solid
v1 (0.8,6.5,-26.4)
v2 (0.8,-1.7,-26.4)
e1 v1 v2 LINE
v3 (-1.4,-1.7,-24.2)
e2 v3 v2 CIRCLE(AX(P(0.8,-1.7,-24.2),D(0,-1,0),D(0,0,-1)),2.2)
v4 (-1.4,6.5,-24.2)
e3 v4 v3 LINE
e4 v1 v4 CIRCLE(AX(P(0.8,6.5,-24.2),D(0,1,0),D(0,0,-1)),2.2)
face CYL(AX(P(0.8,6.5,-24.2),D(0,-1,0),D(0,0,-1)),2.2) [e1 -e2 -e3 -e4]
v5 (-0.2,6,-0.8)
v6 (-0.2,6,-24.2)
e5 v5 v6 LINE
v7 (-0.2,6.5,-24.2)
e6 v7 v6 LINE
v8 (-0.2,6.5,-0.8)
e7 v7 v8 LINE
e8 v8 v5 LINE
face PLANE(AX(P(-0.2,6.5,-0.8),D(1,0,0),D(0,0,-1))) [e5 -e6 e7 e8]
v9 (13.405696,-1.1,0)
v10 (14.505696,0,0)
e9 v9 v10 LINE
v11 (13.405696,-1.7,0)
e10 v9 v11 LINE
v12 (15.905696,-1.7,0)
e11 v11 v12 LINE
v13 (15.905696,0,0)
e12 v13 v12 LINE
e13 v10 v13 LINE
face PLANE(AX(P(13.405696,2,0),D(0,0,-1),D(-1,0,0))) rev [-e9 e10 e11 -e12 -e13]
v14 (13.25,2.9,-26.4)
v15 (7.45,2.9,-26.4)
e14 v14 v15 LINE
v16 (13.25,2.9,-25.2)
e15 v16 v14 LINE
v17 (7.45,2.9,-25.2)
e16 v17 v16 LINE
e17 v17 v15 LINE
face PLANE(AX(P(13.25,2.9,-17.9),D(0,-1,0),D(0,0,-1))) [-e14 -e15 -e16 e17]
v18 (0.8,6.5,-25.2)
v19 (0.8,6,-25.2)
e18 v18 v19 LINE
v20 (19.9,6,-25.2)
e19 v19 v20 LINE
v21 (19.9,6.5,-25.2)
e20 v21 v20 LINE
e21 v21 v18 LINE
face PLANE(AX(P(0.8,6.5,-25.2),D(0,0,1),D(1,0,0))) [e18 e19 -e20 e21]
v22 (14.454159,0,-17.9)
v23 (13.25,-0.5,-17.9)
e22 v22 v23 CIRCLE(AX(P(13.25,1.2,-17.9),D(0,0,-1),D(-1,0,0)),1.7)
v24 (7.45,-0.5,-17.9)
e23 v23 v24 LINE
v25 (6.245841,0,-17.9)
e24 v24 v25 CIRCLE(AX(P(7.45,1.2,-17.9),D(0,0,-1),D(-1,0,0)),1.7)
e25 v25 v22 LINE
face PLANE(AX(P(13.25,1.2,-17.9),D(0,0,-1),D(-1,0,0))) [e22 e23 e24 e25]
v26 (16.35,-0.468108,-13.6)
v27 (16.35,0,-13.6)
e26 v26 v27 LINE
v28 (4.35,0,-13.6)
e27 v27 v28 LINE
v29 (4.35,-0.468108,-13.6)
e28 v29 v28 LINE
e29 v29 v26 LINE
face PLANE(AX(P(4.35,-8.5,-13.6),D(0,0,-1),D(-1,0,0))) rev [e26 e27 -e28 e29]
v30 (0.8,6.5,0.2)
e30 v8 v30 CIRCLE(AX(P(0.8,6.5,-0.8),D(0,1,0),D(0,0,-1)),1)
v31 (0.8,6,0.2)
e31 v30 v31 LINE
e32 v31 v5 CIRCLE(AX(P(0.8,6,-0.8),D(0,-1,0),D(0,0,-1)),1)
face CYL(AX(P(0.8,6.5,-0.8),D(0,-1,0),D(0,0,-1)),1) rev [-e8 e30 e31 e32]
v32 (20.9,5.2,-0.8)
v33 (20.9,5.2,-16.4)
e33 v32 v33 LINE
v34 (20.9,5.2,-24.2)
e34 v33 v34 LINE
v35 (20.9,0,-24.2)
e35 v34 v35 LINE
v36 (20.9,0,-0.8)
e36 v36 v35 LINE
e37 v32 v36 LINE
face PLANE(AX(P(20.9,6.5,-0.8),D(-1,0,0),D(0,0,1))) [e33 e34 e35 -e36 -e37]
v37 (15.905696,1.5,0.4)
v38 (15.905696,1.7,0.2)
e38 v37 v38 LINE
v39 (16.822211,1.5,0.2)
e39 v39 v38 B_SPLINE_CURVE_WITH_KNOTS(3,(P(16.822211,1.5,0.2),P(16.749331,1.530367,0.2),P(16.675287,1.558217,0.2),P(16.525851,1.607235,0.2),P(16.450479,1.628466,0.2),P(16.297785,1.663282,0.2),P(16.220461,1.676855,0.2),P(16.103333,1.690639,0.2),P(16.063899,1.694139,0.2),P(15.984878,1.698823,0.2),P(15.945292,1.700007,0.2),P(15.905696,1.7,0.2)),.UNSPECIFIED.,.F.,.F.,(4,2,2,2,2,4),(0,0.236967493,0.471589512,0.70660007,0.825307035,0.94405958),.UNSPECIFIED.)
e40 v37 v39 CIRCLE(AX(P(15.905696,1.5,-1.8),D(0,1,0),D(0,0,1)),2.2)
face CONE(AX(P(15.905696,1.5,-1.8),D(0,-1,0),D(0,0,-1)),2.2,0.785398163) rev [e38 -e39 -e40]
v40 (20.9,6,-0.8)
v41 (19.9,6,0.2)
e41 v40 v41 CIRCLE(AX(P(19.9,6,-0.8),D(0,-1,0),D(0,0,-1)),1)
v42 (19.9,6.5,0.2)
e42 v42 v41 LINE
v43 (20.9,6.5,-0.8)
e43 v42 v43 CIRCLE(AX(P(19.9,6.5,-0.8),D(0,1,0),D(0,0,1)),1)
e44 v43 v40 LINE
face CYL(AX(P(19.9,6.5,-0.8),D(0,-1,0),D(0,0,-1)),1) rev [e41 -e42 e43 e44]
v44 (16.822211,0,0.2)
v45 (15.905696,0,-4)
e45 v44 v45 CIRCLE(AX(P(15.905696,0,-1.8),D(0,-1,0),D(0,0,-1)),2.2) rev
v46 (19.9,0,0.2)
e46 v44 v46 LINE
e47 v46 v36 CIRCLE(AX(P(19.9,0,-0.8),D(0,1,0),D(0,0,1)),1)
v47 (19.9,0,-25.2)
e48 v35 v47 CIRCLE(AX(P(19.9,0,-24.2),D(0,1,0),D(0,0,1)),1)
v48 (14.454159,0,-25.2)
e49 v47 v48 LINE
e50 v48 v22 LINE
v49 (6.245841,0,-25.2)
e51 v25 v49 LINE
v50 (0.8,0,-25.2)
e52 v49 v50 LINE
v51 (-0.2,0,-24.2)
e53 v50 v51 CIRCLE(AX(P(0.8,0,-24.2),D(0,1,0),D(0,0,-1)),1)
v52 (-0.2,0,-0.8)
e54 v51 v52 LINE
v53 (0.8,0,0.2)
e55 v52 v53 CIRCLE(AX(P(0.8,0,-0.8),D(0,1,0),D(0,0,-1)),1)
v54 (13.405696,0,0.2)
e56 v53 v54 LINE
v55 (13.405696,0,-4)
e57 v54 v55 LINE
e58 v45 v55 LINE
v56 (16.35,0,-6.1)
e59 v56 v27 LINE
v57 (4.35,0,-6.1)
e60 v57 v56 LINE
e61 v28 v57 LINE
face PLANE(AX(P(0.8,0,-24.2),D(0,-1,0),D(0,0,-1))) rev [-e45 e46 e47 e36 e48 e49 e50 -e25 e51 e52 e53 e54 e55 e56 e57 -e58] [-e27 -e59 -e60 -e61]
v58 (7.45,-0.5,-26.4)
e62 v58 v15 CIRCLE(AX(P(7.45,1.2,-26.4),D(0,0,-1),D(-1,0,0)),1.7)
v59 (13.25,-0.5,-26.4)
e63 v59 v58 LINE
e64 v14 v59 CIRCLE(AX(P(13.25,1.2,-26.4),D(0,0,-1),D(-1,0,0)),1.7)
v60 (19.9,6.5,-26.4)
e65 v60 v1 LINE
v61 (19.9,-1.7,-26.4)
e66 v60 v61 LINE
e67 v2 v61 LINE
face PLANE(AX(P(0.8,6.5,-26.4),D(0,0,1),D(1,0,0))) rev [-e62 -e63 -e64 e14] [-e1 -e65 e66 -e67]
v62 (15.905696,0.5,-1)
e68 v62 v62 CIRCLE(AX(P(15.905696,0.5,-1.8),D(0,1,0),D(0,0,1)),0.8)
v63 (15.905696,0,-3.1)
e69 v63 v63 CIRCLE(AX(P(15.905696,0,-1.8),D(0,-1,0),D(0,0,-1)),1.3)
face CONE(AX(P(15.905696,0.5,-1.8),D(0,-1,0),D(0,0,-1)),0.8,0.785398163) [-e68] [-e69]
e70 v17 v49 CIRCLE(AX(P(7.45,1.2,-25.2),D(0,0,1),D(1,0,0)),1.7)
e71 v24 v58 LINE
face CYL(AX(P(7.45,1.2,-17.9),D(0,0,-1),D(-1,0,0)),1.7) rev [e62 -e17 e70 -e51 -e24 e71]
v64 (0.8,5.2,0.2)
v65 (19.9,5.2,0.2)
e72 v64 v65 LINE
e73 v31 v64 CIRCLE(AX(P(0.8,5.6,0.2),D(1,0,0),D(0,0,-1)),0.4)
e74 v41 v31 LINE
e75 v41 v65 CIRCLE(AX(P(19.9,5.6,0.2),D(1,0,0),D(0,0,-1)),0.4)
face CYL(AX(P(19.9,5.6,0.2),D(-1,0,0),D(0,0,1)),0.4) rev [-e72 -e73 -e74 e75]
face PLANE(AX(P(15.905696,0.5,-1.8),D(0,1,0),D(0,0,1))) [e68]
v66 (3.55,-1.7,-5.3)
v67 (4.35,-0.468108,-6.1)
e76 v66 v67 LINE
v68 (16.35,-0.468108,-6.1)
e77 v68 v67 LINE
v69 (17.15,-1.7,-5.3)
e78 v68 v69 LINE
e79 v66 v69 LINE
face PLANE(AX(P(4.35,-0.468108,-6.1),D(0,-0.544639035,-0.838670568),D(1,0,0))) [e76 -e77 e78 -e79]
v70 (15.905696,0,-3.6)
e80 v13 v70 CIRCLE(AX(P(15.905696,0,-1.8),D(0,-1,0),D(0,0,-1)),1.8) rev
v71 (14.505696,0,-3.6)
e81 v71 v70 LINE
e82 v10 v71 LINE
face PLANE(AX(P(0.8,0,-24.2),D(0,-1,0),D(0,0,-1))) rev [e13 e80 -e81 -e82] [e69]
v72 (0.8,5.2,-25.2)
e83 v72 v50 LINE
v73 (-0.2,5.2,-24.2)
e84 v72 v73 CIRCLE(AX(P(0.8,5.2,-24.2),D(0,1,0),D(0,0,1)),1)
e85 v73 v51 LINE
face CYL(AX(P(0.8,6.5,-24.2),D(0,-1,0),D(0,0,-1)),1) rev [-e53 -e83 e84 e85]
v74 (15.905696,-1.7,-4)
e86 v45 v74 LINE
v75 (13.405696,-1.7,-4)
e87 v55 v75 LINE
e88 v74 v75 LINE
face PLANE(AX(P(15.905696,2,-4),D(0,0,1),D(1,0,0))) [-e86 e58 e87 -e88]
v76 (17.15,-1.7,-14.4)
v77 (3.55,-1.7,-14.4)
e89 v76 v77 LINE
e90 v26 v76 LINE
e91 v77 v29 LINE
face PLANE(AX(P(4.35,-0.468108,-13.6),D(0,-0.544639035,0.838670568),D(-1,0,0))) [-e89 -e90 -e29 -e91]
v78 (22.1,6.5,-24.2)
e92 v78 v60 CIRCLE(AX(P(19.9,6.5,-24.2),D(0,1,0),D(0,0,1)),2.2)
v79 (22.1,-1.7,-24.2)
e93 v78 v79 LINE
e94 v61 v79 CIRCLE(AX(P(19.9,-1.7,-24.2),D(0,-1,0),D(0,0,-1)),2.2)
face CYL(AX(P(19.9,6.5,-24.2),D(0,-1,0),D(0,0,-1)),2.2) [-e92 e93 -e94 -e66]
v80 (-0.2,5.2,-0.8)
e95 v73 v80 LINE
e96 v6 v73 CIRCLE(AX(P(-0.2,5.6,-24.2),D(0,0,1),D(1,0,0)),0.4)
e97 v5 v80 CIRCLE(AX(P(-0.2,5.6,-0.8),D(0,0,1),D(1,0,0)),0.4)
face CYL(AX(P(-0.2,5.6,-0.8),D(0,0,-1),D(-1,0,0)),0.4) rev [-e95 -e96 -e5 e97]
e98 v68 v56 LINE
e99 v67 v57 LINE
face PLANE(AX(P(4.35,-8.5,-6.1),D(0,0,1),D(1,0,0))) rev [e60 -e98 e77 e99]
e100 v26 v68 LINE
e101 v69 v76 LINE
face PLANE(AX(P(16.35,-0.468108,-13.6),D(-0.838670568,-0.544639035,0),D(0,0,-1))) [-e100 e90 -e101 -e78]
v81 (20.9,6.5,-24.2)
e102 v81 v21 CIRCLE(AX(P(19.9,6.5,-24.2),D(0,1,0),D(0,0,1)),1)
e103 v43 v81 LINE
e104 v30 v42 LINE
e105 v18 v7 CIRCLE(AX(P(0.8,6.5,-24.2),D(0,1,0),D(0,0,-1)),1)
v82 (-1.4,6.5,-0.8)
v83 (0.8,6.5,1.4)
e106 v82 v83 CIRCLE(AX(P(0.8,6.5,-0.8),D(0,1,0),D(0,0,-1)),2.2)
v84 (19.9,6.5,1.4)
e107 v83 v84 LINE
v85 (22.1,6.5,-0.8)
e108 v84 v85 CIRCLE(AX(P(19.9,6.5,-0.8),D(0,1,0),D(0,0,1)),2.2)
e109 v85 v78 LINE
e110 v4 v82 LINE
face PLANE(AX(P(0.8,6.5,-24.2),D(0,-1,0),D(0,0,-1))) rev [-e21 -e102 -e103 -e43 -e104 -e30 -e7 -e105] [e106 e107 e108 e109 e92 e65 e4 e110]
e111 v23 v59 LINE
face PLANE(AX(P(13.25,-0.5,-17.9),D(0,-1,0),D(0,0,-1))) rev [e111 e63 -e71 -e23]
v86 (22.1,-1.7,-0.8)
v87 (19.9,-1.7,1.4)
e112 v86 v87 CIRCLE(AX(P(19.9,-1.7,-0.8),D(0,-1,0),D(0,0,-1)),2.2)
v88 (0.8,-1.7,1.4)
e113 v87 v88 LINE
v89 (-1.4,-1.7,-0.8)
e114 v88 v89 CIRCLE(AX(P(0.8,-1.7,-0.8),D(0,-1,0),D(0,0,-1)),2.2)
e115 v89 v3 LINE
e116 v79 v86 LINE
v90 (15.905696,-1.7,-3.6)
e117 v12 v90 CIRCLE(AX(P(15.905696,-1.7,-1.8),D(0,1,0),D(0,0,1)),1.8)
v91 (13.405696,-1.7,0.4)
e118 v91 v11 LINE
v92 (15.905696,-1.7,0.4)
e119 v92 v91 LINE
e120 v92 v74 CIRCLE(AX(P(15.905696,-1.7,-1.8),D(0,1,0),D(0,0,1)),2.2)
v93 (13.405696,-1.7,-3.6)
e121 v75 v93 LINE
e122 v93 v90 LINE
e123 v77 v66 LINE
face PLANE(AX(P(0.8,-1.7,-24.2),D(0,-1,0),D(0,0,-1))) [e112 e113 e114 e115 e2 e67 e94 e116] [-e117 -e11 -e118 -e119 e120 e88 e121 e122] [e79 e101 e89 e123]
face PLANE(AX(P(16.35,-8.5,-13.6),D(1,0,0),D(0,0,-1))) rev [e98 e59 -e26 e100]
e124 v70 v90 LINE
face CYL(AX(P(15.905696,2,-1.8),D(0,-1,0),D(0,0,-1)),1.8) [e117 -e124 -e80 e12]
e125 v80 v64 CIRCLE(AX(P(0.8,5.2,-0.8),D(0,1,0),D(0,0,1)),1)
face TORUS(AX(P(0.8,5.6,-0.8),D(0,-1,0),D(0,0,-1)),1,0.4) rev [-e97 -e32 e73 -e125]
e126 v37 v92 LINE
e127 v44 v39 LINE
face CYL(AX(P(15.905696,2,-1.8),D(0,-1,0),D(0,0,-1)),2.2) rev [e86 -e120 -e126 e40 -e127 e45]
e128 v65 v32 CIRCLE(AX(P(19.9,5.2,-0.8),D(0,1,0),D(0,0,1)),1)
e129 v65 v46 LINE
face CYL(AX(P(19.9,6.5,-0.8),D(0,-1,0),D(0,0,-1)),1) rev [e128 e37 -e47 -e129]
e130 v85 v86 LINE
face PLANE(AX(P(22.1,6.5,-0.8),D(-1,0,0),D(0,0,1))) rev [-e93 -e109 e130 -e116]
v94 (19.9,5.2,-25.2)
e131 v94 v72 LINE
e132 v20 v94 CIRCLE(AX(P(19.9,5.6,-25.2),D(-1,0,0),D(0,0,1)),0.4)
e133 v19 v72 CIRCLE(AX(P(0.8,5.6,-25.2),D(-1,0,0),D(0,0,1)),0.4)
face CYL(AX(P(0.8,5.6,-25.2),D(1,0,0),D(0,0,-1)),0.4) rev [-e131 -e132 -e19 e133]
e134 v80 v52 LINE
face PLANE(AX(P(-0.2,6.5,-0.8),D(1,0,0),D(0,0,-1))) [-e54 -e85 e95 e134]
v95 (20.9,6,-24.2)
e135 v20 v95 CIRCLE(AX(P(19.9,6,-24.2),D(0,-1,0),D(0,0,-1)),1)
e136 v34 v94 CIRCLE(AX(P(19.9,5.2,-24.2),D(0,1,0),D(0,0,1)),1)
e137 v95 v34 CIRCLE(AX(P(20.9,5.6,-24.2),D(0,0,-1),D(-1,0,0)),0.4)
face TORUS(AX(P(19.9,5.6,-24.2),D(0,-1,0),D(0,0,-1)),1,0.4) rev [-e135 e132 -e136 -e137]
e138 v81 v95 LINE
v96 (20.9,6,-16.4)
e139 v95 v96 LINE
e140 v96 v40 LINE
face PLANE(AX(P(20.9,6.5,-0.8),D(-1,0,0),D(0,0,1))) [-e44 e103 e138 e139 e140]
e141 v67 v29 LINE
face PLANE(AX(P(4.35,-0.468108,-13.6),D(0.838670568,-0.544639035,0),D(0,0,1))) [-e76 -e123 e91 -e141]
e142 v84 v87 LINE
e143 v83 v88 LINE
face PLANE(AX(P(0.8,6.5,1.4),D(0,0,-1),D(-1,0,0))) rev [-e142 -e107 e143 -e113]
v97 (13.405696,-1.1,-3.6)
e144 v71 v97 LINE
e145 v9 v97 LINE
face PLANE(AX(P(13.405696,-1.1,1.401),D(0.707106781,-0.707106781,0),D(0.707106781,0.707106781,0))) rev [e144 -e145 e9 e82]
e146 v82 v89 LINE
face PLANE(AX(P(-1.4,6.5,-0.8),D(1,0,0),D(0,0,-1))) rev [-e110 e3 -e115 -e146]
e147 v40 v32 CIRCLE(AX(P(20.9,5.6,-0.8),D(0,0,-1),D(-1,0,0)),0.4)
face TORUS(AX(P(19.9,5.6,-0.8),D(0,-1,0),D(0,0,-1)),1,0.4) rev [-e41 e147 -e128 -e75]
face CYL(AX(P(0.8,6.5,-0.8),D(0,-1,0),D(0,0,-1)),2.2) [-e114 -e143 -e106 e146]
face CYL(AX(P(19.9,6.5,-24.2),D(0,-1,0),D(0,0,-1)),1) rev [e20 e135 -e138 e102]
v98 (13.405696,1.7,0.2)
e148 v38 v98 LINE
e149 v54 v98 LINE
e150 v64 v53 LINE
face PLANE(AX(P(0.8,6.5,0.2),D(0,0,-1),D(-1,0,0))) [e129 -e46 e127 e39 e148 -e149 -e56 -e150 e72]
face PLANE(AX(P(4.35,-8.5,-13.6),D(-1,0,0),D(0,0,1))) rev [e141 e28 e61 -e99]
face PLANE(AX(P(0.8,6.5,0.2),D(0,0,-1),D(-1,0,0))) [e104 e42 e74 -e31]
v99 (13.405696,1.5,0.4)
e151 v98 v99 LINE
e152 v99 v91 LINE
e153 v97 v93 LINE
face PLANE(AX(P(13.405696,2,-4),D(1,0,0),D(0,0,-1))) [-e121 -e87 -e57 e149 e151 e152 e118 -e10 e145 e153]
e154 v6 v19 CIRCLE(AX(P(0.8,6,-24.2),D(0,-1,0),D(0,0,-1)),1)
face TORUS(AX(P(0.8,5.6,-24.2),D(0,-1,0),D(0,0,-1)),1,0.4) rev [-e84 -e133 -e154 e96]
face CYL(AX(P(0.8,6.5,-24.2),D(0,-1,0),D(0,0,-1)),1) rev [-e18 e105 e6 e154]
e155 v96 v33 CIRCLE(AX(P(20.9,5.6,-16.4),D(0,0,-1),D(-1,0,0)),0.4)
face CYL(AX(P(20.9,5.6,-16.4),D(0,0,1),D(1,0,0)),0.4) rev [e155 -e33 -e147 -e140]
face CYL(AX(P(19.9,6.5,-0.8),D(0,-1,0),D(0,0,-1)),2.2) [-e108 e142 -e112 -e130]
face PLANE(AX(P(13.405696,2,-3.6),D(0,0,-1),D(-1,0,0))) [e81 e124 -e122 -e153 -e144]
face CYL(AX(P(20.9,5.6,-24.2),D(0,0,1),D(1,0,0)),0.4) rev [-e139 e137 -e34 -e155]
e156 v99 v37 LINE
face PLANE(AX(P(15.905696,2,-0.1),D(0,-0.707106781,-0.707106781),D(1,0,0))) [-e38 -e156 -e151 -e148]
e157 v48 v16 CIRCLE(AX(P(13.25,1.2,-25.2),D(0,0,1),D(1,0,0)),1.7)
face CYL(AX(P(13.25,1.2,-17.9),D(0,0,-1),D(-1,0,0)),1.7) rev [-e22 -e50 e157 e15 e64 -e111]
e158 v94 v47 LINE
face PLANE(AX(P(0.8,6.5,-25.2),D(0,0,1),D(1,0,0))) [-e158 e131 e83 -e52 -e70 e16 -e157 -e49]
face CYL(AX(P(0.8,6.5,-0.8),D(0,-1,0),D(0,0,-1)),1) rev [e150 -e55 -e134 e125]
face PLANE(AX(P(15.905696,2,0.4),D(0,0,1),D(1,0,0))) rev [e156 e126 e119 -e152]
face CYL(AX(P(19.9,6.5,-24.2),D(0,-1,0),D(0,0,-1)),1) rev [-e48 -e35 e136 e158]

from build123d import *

# Parameters (mm, degrees)
BOSS_EXTRUDE7_DEPTH     = 6.5
BOSS_EXTRUDE8_START     = 1.7
BOSS_EXTRUDE8_DEPTH     = 1.7
CUT_EXTRUDE1_DEPTH      = 8.5
SKETCH6_W               = 12
SKETCH6_H               = 7.5
CUT_EXTRUDE2_DEPTH      = 8.5
CHAMFER1_SIZE           = 0.8
CHAMFER1_SIZE2          = 1.231891971
SKETCH7_R               = 0.4
CUT_EXTRUDE3_DEPTH      = 2
CUT_EXTRUDE3_DEPTH_BACK = 36.03740858
CHAMFER2_SIZE           = 0.5
CUT_EXTRUDE4_REACH      = 34.411
SKETCH12_R              = 0.8
BOSS_EXTRUDE9_DEPTH     = 0.5
CHAMFER3_SIZE           = 0.5


# Some blends are built 0.0001 mm under size
with BuildPart() as part:
    # Sketch1 → Boss-Extrude7 (new body)
    with BuildSketch(Plane(origin=(0, 0, 0), x_dir=(1, 0, 0), z_dir=(0, 1, 0))):
        with BuildLine():
            Line((0.8, 26.4), (19.9, 26.4))
            ThreePointArc((19.9, 26.4), (21.455634919, 25.755634919), (22.1, 24.2))
            Line((22.1, 24.2), (22.1, 0.8))
            ThreePointArc((22.1, 0.8), (21.455634919, -0.755634919), (19.9, -1.4))
            Line((19.9, -1.4), (0.8, -1.4))
            ThreePointArc((0.8, -1.4), (-0.755634919, -0.755634919), (-1.4, 0.8))
            Line((-1.4, 0.8), (-1.4, 24.2))
            ThreePointArc((-1.4, 24.2), (-0.755634919, 25.755634919), (0.8, 26.4))
        make_face()
        with BuildLine():
            Line((0.8, 25.2), (19.9, 25.2))
            ThreePointArc((19.9, 25.2), (20.607106781, 24.907106781), (20.9, 24.2))
            Line((20.9, 24.2), (20.9, 0.8))
            ThreePointArc((20.9, 0.8), (20.607106781, 0.092893219), (19.9, -0.2))
            Line((19.9, -0.2), (0.8, -0.2))
            ThreePointArc((0.8, -0.2), (0.092893219, 0.092893219), (-0.2, 0.8))
            Line((-0.2, 0.8), (-0.2, 24.2))
            ThreePointArc((-0.2, 24.2), (0.092893219, 24.907106781), (0.8, 25.2))
        make_face(mode=Mode.SUBTRACT)
    extrude(amount=BOSS_EXTRUDE7_DEPTH)

    # Sketch4 → Boss-Extrude8 (add)
    with BuildSketch(Plane.XZ.offset(BOSS_EXTRUDE8_START)):
        with BuildLine():
            Line((0.8, -26.4), (19.9, -26.4))
            ThreePointArc((19.9, -26.4), (21.455634919, -25.755634919), (22.1, -24.2))
            Line((22.1, -24.2), (22.1, -0.8))
            ThreePointArc((22.1, -0.8), (21.455634919, 0.755634919), (19.9, 1.4))
            Line((19.9, 1.4), (0.8, 1.4))
            ThreePointArc((0.8, 1.4), (-0.755634919, 0.755634919), (-1.4, -0.8))
            Line((-1.4, -0.8), (-1.4, -24.2))
            ThreePointArc((-1.4, -24.2), (-0.755634919, -25.755634919), (0.8, -26.4))
        make_face()
    extrude(amount=-BOSS_EXTRUDE8_DEPTH)

    # Sketch5 → Cut-Extrude1 (cut)
    with BuildSketch(Plane(origin=(0, 0, -26.4), x_dir=(-1, 0, 0), z_dir=(0, 0, -1))):
        with BuildLine():
            Line((-13.25, 2.9), (-7.45, 2.9))
            ThreePointArc((-7.45, 2.9), (-5.75, 1.2), (-7.45, -0.5))
            Line((-7.45, -0.5), (-13.25, -0.5))
            ThreePointArc((-13.25, -0.5), (-14.95, 1.2), (-13.25, 2.9))
        make_face()
    extrude(amount=-CUT_EXTRUDE1_DEPTH, mode=Mode.SUBTRACT)

    # Sketch6 → Cut-Extrude2 (cut)
    with BuildSketch(Plane(origin=(0, 0, 0), x_dir=(1, 0, 0), z_dir=(0, 1, 0))):
        with Locations((10.35, 9.85)):
            Rectangle(SKETCH6_W, SKETCH6_H)
    extrude(amount=-CUT_EXTRUDE2_DEPTH, mode=Mode.SUBTRACT)

    # Chamfer1
    chamfer1_edges = [part.edges().sort_by_distance(p)[0] for p in [
        (10.35, -1.7, -6.1),
        (16.35, -1.7, -9.85),
        (10.35, -1.7, -13.6),
        (4.35, -1.7, -9.85),
    ]]
    chamfer1_side = [part.faces().sort_by_distance(p)[0] for p in [
        (-0.498235424, -1.7, -25.498235424),
    ]]
    chamfer(chamfer1_edges, length=CHAMFER1_SIZE, length2=CHAMFER1_SIZE2, reference=chamfer1_side[0])

    # Cut-Sweep1: sweep along a path in Sketch9
    with BuildLine(Plane(origin=(0, 6.5, 0), x_dir=(1, 0, 0), z_dir=(0, 1, 0))) as cut_sweep1_path:
        Line((-1.4, 24.2), (-1.4, 0.8))
        ThreePointArc((-1.4, 0.8), (-0.755634919, -0.755634919), (0.8, -1.4))
        Line((0.8, -1.4), (19.9, -1.4))
        ThreePointArc((19.9, -1.4), (21.455634919, -0.755634919), (22.1, 0.8))
        Line((22.1, 0.8), (22.1, 24.2))
        ThreePointArc((22.1, 24.2), (21.455634919, 25.755634919), (19.9, 26.4))
        Line((19.9, 26.4), (0.8, 26.4))
        ThreePointArc((0.8, 26.4), (-0.755634919, 25.755634919), (-1.4, 24.2))
    # Sketch7 → Cut-Sweep1 (sweep, cut)
    with BuildSketch(Plane(origin=(0, 0, -16.4), x_dir=(-1, 0, 0), z_dir=(0, 0, -1))):
        with Locations((-20.9, 5.6)):
            Circle(SKETCH7_R)
    sweep(path=cut_sweep1_path.line, mode=Mode.SUBTRACT)

    # Sketch10 → Cut-Extrude3 (cut, two sides: drawn at the far end of the back side and taken through both)
    with BuildSketch(Plane(origin=(0, 0, 0), x_dir=(1, 0, 0), z_dir=(0, 1, 0)).offset(-CUT_EXTRUDE3_DEPTH_BACK)):
        with BuildLine():
            Line((15.905695732, 4), (13.405695732, 4))
            Line((13.405695732, 4), (13.405695732, 3.6))
            Line((13.405695732, 3.6), (15.905695732, 3.6))
            ThreePointArc((15.905695732, 3.6), (17.705695732, 1.8), (15.905695732, 0))
            Line((15.905695732, 0), (13.405695732, 0))
            Line((13.405695732, 0), (13.405695732, -0.4))
            Line((13.405695732, -0.4), (15.905695732, -0.4))
            ThreePointArc((15.905695732, -0.4), (18.105695732, 1.8), (15.905695732, 4))
        make_face()
    extrude(amount=CUT_EXTRUDE3_DEPTH + CUT_EXTRUDE3_DEPTH_BACK, mode=Mode.SUBTRACT)

    # Chamfer2
    # the kernel refuses this chamfer: 0.5 mm, written as the material it adds along each edge
    with BuildSketch(Plane(origin=(15.905695732, 2, -1.8), x_dir=(0, 0, 1), z_dir=(-1, 0, 0))) as chamfer2_piece_1_section:
        Polygon((2.2, -CHAMFER2_SIZE), (2.2 - CHAMFER2_SIZE, 0), (2.2, 0), align=None)
    chamfer2_piece_1 = revolve(axis=Axis((15.905695732, 2, -1.8), (0, 1, 0)), revolution_arc=58.108843161, mode=Mode.PRIVATE)
    chamfer2_piece_1 = split(chamfer2_piece_1, bisect_by=Plane(origin=(16.26277058, 1.786381102, 0.2), z_dir=(0, 0, 1)), keep=Keep.TOP, mode=Mode.PRIVATE)
    add(chamfer2_piece_1)
    with BuildSketch(Plane(origin=(12.119854238, 2, 0.4), x_dir=(0, -0.9996219169112968, 0.02749587661058638), z_dir=(1, 0, 0))) as chamfer2_piece_2_section:
        Polygon((CHAMFER2_SIZE * 0.999621916911, CHAMFER2_SIZE * 0.0274958766106), (-CHAMFER2_SIZE * 0.0274958766106, CHAMFER2_SIZE * 0.999621916911), (0, 0), align=None)
    chamfer2_piece_2 = extrude(amount=3.785841494, mode=Mode.PRIVATE)
    chamfer2_piece_2 = split(chamfer2_piece_2, bisect_by=Plane(origin=(14.374950242, 1.792648103, 0.2), z_dir=(0, 0, 1)), keep=Keep.TOP, mode=Mode.PRIVATE)
    add(chamfer2_piece_2)

    # Sketch11 → Cut-Extrude4 (cut, up to next)
    with BuildSketch(Plane(origin=(0, 0, -3.6), x_dir=(-1, 0, 0), z_dir=(0, 0, -1)), mode=Mode.PRIVATE) as cut_extrude4_sk1:
        Polygon((-13.405695732, 0), (-13.405695732, -1.1), (-14.505695732, 0), align=None)
    cut_extrude4_tool1 = extrude(cut_extrude4_sk1.sketch, amount=-CUT_EXTRUDE4_REACH, mode=Mode.PRIVATE) & part.part
    add(cut_extrude4_tool1.solids().sort_by_distance((13.772362, -0.366667, -3.6))[0], mode=Mode.SUBTRACT)

    # Sketch12 → Boss-Extrude9 (add)
    with BuildSketch(Plane(origin=(0, 0, 0), x_dir=(1, 0, 0), z_dir=(0, 1, 0))):
        with Locations(Location((15.905695732, 1.8, 0), (0, 0, 270))):
            Circle(SKETCH12_R)
    extrude(amount=BOSS_EXTRUDE9_DEPTH)

    # Chamfer3
    chamfer3_edges = [part.edges().sort_by_distance(p)[0] for p in [
        (15.905695732, 0, -2.6),
    ]]
    chamfer(chamfer3_edges, length=CHAMFER3_SIZE - 0.0001)  # a hair under: the kernel refuses the full size


solid = part.part
